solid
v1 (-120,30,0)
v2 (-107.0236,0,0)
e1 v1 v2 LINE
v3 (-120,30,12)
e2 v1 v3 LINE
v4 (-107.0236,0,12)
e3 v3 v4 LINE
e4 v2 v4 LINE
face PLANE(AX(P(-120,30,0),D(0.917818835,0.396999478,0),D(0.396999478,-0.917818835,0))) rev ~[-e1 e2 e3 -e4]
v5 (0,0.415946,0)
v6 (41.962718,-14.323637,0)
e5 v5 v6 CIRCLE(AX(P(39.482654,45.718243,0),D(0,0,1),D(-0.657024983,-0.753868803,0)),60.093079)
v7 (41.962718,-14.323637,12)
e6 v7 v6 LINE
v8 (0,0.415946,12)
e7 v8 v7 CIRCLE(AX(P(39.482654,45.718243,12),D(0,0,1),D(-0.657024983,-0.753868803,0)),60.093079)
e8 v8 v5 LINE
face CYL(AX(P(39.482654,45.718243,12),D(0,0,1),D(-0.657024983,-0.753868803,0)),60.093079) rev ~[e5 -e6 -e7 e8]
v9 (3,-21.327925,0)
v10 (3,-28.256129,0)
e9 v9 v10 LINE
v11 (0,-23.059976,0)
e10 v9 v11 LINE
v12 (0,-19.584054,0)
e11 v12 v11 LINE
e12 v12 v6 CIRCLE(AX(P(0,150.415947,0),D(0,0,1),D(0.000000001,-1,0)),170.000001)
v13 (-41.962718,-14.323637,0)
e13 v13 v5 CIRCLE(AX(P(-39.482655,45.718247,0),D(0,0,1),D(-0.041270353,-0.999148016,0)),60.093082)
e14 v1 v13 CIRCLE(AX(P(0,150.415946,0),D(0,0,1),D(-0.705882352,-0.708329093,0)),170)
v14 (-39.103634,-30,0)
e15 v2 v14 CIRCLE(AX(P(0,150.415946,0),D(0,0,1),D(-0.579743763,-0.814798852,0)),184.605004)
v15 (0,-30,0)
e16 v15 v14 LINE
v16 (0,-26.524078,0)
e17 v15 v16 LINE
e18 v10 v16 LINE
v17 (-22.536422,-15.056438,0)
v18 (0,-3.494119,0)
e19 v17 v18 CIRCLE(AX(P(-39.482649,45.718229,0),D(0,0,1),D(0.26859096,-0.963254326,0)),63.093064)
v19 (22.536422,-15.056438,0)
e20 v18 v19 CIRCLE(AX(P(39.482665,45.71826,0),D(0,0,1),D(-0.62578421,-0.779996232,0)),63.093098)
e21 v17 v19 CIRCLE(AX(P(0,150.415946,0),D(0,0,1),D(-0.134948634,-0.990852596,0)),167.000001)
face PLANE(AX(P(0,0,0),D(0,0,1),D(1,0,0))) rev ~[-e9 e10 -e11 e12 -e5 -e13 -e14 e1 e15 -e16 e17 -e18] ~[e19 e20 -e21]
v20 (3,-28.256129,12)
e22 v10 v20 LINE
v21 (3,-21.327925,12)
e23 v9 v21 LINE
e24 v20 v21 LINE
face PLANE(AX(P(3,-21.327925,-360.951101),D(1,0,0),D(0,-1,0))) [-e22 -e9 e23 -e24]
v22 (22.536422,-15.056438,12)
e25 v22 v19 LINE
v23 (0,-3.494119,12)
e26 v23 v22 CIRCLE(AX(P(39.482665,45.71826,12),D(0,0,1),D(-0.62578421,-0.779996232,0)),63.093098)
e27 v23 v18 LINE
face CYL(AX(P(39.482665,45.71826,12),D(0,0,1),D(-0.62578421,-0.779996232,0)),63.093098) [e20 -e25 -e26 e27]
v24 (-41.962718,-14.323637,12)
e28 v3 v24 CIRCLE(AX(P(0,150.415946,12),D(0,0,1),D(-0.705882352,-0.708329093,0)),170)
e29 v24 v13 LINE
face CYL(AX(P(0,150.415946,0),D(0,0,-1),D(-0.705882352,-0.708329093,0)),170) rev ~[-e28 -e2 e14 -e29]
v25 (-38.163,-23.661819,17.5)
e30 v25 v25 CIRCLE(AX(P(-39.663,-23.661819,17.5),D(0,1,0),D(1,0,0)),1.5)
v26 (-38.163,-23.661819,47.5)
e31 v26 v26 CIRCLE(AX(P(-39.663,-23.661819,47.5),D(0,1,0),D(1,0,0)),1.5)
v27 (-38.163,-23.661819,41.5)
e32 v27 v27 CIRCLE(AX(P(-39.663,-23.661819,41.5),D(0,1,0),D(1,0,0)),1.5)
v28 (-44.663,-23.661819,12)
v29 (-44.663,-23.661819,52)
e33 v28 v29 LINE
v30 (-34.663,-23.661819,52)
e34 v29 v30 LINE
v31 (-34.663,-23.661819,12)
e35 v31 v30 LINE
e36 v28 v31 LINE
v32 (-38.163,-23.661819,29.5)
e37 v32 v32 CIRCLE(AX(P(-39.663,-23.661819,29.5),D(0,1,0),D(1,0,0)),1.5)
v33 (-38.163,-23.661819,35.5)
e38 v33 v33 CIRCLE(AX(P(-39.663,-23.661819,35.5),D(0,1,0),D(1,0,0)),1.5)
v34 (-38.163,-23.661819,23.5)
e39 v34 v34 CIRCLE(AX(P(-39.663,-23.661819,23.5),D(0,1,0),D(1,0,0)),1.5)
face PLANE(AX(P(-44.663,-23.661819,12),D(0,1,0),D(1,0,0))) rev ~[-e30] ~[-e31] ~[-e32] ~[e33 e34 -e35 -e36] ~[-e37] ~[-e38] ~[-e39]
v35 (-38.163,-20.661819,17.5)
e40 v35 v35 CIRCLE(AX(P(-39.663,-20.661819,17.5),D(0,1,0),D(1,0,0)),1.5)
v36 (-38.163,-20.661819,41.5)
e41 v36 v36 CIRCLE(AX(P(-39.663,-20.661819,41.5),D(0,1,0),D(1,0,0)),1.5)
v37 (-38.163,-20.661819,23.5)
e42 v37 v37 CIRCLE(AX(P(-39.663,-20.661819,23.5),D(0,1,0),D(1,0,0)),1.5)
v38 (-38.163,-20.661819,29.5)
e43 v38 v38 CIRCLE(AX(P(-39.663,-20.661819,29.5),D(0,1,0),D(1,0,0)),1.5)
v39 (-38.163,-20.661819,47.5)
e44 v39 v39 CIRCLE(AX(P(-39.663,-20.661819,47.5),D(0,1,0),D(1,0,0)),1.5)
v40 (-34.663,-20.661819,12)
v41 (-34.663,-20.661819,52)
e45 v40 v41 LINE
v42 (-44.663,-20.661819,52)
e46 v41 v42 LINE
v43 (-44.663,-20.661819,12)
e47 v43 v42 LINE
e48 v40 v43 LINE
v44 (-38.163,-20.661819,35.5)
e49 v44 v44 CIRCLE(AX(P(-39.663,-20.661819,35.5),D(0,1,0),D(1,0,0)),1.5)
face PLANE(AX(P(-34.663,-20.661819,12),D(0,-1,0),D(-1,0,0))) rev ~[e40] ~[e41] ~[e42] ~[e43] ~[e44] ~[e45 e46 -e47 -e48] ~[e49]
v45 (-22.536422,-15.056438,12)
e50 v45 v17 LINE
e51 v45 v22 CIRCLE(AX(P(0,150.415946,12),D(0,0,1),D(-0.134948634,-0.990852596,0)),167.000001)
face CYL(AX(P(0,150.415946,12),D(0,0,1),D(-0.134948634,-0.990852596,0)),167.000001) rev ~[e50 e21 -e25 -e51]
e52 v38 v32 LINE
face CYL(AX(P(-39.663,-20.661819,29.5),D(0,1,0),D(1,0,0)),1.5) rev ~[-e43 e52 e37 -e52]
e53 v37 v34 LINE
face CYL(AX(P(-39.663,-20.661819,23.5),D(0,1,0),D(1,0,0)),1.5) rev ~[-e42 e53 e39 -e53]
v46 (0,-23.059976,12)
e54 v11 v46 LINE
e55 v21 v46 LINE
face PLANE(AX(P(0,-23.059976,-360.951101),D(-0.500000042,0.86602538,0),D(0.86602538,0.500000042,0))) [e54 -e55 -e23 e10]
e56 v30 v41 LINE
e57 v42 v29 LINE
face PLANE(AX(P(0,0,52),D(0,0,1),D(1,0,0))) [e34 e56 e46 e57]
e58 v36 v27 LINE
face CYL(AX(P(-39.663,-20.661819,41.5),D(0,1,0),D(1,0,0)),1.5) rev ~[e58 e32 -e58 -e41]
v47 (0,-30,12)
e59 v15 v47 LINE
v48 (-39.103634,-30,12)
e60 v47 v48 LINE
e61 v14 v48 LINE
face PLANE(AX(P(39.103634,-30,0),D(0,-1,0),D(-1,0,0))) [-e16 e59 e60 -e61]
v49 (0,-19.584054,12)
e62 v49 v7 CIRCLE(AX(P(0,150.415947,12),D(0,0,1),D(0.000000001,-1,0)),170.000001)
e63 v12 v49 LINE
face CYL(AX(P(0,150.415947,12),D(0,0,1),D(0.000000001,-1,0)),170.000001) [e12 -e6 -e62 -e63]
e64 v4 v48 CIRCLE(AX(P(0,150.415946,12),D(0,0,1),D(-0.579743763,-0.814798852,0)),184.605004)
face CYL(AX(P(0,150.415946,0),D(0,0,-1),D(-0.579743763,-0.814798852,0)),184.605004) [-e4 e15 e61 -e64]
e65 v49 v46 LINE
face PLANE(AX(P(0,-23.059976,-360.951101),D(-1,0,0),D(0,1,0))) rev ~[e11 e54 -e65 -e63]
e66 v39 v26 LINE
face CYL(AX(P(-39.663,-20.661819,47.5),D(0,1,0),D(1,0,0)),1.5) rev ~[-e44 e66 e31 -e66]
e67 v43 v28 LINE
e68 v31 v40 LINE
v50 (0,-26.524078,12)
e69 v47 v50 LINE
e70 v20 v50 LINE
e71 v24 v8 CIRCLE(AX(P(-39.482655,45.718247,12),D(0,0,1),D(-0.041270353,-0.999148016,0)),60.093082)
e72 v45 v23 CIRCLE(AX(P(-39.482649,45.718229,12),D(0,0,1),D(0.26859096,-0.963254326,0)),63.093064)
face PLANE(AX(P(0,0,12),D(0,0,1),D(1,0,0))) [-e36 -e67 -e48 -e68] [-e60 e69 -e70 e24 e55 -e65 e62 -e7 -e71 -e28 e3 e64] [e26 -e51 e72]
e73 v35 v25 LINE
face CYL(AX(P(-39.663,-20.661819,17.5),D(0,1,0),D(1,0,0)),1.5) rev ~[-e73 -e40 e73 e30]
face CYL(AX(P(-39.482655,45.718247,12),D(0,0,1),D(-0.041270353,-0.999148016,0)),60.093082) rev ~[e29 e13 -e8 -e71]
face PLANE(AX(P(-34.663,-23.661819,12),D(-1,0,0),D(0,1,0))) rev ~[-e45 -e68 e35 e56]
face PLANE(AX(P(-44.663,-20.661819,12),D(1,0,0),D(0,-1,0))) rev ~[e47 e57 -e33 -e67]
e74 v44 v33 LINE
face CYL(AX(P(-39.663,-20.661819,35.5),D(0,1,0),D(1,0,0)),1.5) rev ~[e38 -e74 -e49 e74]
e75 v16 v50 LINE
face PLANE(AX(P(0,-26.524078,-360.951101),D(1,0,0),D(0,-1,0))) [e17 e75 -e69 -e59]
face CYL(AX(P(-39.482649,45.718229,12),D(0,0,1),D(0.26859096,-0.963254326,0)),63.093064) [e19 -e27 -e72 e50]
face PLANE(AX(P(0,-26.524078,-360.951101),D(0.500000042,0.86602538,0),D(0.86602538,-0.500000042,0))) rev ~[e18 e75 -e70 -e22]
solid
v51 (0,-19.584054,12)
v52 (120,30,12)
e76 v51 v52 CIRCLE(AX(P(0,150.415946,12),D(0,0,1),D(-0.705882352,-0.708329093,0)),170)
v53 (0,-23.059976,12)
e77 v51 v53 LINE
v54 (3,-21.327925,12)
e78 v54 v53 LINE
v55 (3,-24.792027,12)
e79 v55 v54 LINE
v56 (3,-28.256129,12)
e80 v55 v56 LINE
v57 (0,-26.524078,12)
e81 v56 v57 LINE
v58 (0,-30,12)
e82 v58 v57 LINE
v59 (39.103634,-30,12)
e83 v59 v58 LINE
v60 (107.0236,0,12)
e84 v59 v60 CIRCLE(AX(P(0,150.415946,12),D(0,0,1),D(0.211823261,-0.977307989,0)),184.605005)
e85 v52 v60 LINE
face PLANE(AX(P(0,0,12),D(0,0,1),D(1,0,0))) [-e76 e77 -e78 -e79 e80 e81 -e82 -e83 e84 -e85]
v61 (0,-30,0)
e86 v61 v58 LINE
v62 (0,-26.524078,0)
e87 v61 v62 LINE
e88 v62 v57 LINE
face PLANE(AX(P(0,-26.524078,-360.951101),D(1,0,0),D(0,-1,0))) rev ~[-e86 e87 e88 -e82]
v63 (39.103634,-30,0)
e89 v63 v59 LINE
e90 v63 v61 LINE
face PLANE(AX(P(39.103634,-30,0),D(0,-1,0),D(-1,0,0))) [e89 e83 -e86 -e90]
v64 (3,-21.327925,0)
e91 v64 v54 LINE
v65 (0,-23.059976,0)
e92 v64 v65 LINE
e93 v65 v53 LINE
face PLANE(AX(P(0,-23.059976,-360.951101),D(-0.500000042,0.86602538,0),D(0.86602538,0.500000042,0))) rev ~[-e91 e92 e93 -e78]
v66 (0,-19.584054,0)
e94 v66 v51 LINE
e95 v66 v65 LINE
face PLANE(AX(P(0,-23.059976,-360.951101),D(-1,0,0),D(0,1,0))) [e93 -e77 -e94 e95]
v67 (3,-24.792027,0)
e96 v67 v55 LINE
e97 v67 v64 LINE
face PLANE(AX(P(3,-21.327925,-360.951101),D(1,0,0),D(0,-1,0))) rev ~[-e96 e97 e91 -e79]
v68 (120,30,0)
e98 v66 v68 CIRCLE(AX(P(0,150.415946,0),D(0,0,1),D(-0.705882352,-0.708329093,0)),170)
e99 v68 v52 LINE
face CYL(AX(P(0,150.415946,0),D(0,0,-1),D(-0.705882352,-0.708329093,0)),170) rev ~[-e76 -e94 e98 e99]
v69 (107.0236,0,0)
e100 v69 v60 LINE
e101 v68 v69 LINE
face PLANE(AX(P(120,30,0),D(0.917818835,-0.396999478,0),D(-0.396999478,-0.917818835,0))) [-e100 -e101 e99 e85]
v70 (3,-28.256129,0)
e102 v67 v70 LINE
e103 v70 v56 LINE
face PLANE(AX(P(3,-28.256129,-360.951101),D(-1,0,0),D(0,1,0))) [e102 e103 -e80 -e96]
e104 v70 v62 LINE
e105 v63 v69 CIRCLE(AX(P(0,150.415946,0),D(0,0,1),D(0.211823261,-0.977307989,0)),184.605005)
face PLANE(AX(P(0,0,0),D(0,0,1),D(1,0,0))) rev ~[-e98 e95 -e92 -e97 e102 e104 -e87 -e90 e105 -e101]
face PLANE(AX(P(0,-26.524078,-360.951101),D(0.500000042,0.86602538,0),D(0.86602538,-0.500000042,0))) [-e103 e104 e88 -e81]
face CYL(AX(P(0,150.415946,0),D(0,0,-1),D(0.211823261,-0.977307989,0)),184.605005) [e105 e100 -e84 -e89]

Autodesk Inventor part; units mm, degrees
sketch "Эскиз1" plane through (0, 0, 0) normal (0, 0, 1) x (1, 0, 0)
  line L0 (39.103634, -30) -> (-39.103634, -30)
  line L1 (-120, 30) -> (120, -30) construction
  line L2 (120, 30) -> (-120, -30) construction
  line L3 (0, -30) -> (0, -27) construction
  arc A0 (-120, 30) -> (120, 30) centre (0, 150.415946) ccw
  arc A1 (-107.0236, 0) -> (-39.103634, -30) centre (0, 150.415946) ccw
  arc A2 (39.103634, -30) -> (107.0236, 0) centre (0, 150.415946) ccw
  line L4 (120, 30) -> (107.0236, 0)
  line L5 (-120, 30) -> (-107.0236, 0)
  point P0 (0, 0)
  dimension "d0" = 240
  dimension "d1" = 60
  dimension "d6" = 3
  dimension "d7" = 170
extrude "Выдавливание1" add sketch "Эскиз1" along normal blind 12
sketch "Эскиз2" plane through (0, 0, 12) normal (0, 0, 1) x (1, 0, 0)
  line L0 (-39.103634, -30) -> (39.103634, -30)
  line L1 (-39.103634, -30) -> (39.103634, -30) construction
  line L2 (0, -30) -> (10, -30) construction
  line L3 (0, -30) -> (-10, -30) construction
  arc A0 (-120, 30) -> (120, 30) centre (0, 150.415946) ccw
  line L4 (-120, 30) -> (-107.0236, 0)
  arc A1 (-107.0236, 0) -> (-39.103634, -30) centre (0, 150.415946) ccw
  arc A2 (39.103634, -30) -> (107.0236, 0) centre (0, 150.415946) ccw
  line L5 (107.0236, 0) -> (120, 30)
  point P0 (0, 0)
  point P1 (-12, -3)
  point P2 (12, -3)
  dimension "d4" = 10
  dimension "d5" = 10
sketch "Эскиз3" plane through (0, 0, 12) normal (0, 0, 1) x (1, 0, 0)
  line L0 (-39.103634, -30) -> (39.103634, -30) construction
  line L1 (0, -30) -> (0, -19.584054) construction
  arc A0 (-120, 30) -> (120, 30) centre (0, 150.415946) ccw construction
  line L2 (0, -24.792027) -> (-58.147862, -24.792027) construction
  arc A1 (-107.0236, 0) -> (-39.103634, -30) centre (0, 150.415946) ccw construction
  arc A2 (39.103634, -30) -> (107.0236, 0) centre (0, 150.415946) ccw construction
  line L3 (58.147862, -24.792027) -> (0, -24.792027) construction
  line L4 (0, -24.792027) -> (0, -27.792027)
  line L5 (0, -27.792027) -> (0, -21.792027)
  line L6 (0, -24.792027) -> (6, -24.792027) construction
  line L7 (0, -26.524078) -> (3, -28.256129)
  line L8 (0, -24.792027) -> (6.928203, -24.792027) construction
  line L9 (3, -28.256129) -> (3, -24.792027)
  line L10 (0, -23.059976) -> (3, -21.327925)
  line L11 (0, -24.792027) -> (6.928203, -24.792027) construction
  line L12 (3, -21.327925) -> (3, -24.792027)
  line L13 (0, -24.792027) -> (-3, -24.792027) construction
  line L14 (0, -23.059976) -> (0, -19.584054)
  line L15 (0, -26.524078) -> (0, -30)
  point P0 (0, 0)
  dimension "d8" = 3
  dimension "d9" = 6
  dimension "d10" = 6
  dimension "d11" = 30
  dimension "d12" = 30
  dimension "d13" = 3
sketch "Эскиз4" plane through (0, 0, 0) normal (0, 0, -1) x (-1, 0, 0)
  line L0 (-3, -28.256129) -> (-3, -24.792027)
  line L1 (0, -26.524078) -> (-3, -28.256129)
  line L2 (-3, -21.327925) -> (-3, -24.792027)
  line L3 (0, -23.059976) -> (-3, -21.327925)
  line L4 (0, -24.792027) -> (0, -27.792027)
  line L5 (0, -27.792027) -> (0, -21.792027)
  point P0 (0, 0)
ref_plane "РабПлоскость1" through (3, -21.327925, 12) normal (0.5, -0.8660254, 0) x (-0.8660254, -0.5, 0)
ref_plane "РабПлоскость2" through (3, -21.327925, 0) normal (-1, 0, 0) x (0, -1, 0)
ref_plane "РабПлоскость3" through (0, -26.524078, 12) normal (0.5, 0.8660254, 0) x (0.8660254, -0.5, 0)
ref_plane "РабПлоскость4" through (0, -19.584054, 12) normal (1, 0, 0) x (0, -1, 0)
ref_plane "РабПлоскость5" through (0, -26.524078, 0) normal (-1, 0, 0) x (0, -1, 0)
split body "Разделение1" sketch "Эскиз3" result two bodies curves L15 L7 L9 L12 L10 L14 first body at (-18.576653, -26.256352, 0.5)
sketch "Эскиз5" plane through (0, 0, 12) normal (0, 0, 1) x (1, 0, 0)
  line L0 (0, -19.584054) -> (0, -23.059976)
  arc A0 (-120, 30) -> (0, -19.584054) centre (0, 150.415946) ccw
  line L1 (-120, 30) -> (-107.0236, 0)
  arc A1 (-107.0236, 0) -> (-39.103634, -30) centre (0, 150.415946) ccw
  line L2 (-39.103634, -30) -> (0, -30)
  line L3 (0, -26.524078) -> (0, -30)
  line L4 (3, -28.256129) -> (0, -26.524078)
  line L5 (3, -21.327925) -> (3, -28.256129)
  line L6 (0, -23.059976) -> (3, -21.327925)
  line L7 (39.103634, -30) -> (0, -30)
  line L8 (0, -19.584054) -> (0, -23.059976)
  line L9 (0, -23.059976) -> (3, -21.327925)
  line L10 (3, -21.327925) -> (3, -28.256129)
  line L11 (3, -28.256129) -> (0, -26.524078)
  line L12 (0, -26.524078) -> (0, -30)
  line L13 (0, -30) -> (39.103634, -30)
  arc A2 (39.103634, -30) -> (107.0236, 0) centre (0, 150.415946) ccw
  line L14 (107.0236, 0) -> (120, 30)
  arc A3 (0, -19.584054) -> (120, 30) centre (0, 150.415946) ccw
  arc A4 (0, -19.584054) -> (120, 30) centre (0, 150.415946) ccw construction
  line L15 (0, -19.584054) -> (0, 0.415946) construction
  arc A5 (0, -19.584054) -> (120, 30) centre (0, 150.415946) ccw
  arc A6 (0, 0.415946) -> (41.962718, -14.323637) centre (39.482655, 45.718245) ccw
  arc A7 (-41.962718, -14.323637) -> (0, 0.415946) centre (-39.482655, 45.718245) ccw
  arc A8 (-41.962718, -14.323637) -> (41.962718, -14.323637) centre (0, 150.415946) ccw
  arc A9 (0, -3.494119) -> (22.536422, -15.056438) centre (39.482655, 45.718245) ccw
  arc A10 (-22.536422, -15.056438) -> (22.536422, -15.056438) centre (0, 150.415946) ccw
  arc A11 (-22.536422, -15.056438) -> (0, -3.494119) centre (-39.482655, 45.718245) ccw
  point P0 (0, 0)
  dimension "d15" = 20
  dimension "d18" = 3
extrude "Выдавливание2" add sketch "Эскиз5" against normal up to surface (12 mm away) contours A0 A7 A6 A3 bodies 2
sketch "Эскиз6" plane through (0, 0, 12) normal (0, 0, 1) x (1, 0, 0)
  arc A0 (-22.536422, -15.056438) -> (0, -3.494119) centre (-39.482655, 45.718245) ccw construction
  arc A1 (0, -3.494119) -> (22.536422, -15.056438) centre (39.482655, 45.718245) ccw construction
  arc A2 (-22.536422, -15.056438) -> (22.536422, -15.056438) centre (0, 150.415946) ccw construction
  line L0 (0, -19.584054) -> (0, -23.059976) construction
  arc A3 (0, -19.584054) -> (41.962718, -14.323637) centre (0, 150.415946) ccw construction
  arc A4 (0, 0.415946) -> (41.962718, -14.323637) centre (39.482655, 45.718245) ccw construction
  arc A5 (-41.962718, -14.323637) -> (0, 0.415946) centre (-39.482655, 45.718245) ccw construction
  arc A6 (-120, 30) -> (-41.962718, -14.323637) centre (0, 150.415946) ccw construction
  line L1 (-120, 30) -> (-107.0236, 0) construction
  arc A7 (-107.0236, 0) -> (-39.103634, -30) centre (0, 150.415946) ccw construction
  line L2 (-39.103634, -30) -> (0, -30) construction
  line L3 (0, -26.524078) -> (0, -30) construction
  line L4 (3, -28.256129) -> (0, -26.524078) construction
  line L5 (3, -21.327925) -> (3, -28.256129) construction
  line L6 (0, -23.059976) -> (3, -21.327925) construction
  line L7 (0, -19.584054) -> (0, -23.059976) construction
  line L8 (0, -23.059976) -> (3, -21.327925) construction
  line L9 (3, -21.327925) -> (3, -28.256129) construction
  line L10 (3, -28.256129) -> (0, -26.524078) construction
  line L11 (0, -26.524078) -> (0, -30) construction
  line L12 (0, -30) -> (39.103634, -30) construction
  arc A8 (39.103634, -30) -> (107.0236, 0) centre (0, 150.415946) ccw construction
  line L13 (107.0236, 0) -> (120, 30) construction
  arc A9 (0, -19.584054) -> (120, 30) centre (0, 150.415946) ccw construction
  line L14 (107.0236, 0) -> (-107.0236, 0) construction
  line L15 (0, -30) -> (-100, -30) construction
  line L16 (0, -30) -> (100, -30) construction
  line L17 (100, -30) -> (-34.663, -30) construction
  line L18 (-100, -30) -> (-44.663, -30) construction
  line L19 (-34.663, -30) -> (-44.663, -30) construction
  line L20 (-34.663, -31.5) -> (-44.663, -31.5) construction
  line L21 (-44.663, -31.5) -> (-44.663, -28.5) construction
  line L22 (-44.663, -28.5) -> (-34.663, -28.5) construction
  line L23 (-34.663, -28.5) -> (-34.663, -31.5) construction
  line L24 (-34.663, -31.5) -> (-44.663, -28.5) construction
  line L25 (-44.663, -31.5) -> (-34.663, -28.5) construction
  line L26 (-34.663, -30) -> (-34.663, -14.323637) construction
  line L27 (-44.663, -30) -> (-44.663, -13.612151) construction
  line L28 (-34.663, -22.161819) -> (-44.663, -22.161819) construction
  line L29 (-34.663, -20.661819) -> (-44.663, -20.661819)
  line L30 (-44.663, -20.661819) -> (-44.663, -23.661819)
  line L31 (-44.663, -23.661819) -> (-34.663, -23.661819)
  line L32 (-34.663, -23.661819) -> (-34.663, -20.661819)
  line L33 (-34.663, -20.661819) -> (-44.663, -23.661819) construction
  line L34 (-44.663, -20.661819) -> (-34.663, -23.661819) construction
  point P0 (0, 0)
  point P1 (-39.663, -30)
  point P2 (-39.663, -22.161819)
  dimension "d19" = 100
  dimension "d20" = 100
  dimension "d21" = 134.663
  dimension "d22" = 55.337
  dimension "d23" = 3
  dimension "d24" = 3
extrude "Выдавливание3" add sketch "Эскиз6" along normal blind 40 bodies 2
sketch "Эскиз7" plane through (-44.663, -20.661819, 12) normal (0, 1, 0) x (1, 0, 0)
  line L0 (0, 0) -> (10, 0) projected
  line L1 (0, 0) -> (0, -40) projected
  line L2 (10, -40) -> (0, -40) projected
  line L3 (10, 0) -> (10, -40) projected
  line L4 (0, 0) -> (0, -5.5) construction
  line L5 (0, 0) -> (0, -40) construction
  line L6 (0, -5.5) -> (10, -5.5) construction
  line L7 (5, -40) -> (5, 0) construction
  line L8 (0, 0) -> (10, 0) construction
  circle A0 centre (5, -5.5) radius 1.5
  line L9 (5, -5.5) -> (5, -11.5) construction
  circle A1 centre (5, -11.5) radius 1.5
  circle A2 centre (5, -17.5) radius 1.5
  circle A3 centre (5, -23.5) radius 1.5
  circle A4 centre (5, -29.5) radius 1.5
  circle A5 centre (5, -35.5) radius 1.5
  point P0 (44.663, 12)
  dimension "d27" = 5.5
  dimension "d28" = 3
  dimension "d29" = 6
  dimension "d30" = 3
  dimension "d38" = 6
  dimension "d45" = 6
extrude "Выдавливание4" cut sketch "Эскиз7" against normal blind 6 contours A0 | A1 | A2 | A3 | A4 | A5 bodies 2
equation "\"d31\" = d38"
properties part number "Kick male"
